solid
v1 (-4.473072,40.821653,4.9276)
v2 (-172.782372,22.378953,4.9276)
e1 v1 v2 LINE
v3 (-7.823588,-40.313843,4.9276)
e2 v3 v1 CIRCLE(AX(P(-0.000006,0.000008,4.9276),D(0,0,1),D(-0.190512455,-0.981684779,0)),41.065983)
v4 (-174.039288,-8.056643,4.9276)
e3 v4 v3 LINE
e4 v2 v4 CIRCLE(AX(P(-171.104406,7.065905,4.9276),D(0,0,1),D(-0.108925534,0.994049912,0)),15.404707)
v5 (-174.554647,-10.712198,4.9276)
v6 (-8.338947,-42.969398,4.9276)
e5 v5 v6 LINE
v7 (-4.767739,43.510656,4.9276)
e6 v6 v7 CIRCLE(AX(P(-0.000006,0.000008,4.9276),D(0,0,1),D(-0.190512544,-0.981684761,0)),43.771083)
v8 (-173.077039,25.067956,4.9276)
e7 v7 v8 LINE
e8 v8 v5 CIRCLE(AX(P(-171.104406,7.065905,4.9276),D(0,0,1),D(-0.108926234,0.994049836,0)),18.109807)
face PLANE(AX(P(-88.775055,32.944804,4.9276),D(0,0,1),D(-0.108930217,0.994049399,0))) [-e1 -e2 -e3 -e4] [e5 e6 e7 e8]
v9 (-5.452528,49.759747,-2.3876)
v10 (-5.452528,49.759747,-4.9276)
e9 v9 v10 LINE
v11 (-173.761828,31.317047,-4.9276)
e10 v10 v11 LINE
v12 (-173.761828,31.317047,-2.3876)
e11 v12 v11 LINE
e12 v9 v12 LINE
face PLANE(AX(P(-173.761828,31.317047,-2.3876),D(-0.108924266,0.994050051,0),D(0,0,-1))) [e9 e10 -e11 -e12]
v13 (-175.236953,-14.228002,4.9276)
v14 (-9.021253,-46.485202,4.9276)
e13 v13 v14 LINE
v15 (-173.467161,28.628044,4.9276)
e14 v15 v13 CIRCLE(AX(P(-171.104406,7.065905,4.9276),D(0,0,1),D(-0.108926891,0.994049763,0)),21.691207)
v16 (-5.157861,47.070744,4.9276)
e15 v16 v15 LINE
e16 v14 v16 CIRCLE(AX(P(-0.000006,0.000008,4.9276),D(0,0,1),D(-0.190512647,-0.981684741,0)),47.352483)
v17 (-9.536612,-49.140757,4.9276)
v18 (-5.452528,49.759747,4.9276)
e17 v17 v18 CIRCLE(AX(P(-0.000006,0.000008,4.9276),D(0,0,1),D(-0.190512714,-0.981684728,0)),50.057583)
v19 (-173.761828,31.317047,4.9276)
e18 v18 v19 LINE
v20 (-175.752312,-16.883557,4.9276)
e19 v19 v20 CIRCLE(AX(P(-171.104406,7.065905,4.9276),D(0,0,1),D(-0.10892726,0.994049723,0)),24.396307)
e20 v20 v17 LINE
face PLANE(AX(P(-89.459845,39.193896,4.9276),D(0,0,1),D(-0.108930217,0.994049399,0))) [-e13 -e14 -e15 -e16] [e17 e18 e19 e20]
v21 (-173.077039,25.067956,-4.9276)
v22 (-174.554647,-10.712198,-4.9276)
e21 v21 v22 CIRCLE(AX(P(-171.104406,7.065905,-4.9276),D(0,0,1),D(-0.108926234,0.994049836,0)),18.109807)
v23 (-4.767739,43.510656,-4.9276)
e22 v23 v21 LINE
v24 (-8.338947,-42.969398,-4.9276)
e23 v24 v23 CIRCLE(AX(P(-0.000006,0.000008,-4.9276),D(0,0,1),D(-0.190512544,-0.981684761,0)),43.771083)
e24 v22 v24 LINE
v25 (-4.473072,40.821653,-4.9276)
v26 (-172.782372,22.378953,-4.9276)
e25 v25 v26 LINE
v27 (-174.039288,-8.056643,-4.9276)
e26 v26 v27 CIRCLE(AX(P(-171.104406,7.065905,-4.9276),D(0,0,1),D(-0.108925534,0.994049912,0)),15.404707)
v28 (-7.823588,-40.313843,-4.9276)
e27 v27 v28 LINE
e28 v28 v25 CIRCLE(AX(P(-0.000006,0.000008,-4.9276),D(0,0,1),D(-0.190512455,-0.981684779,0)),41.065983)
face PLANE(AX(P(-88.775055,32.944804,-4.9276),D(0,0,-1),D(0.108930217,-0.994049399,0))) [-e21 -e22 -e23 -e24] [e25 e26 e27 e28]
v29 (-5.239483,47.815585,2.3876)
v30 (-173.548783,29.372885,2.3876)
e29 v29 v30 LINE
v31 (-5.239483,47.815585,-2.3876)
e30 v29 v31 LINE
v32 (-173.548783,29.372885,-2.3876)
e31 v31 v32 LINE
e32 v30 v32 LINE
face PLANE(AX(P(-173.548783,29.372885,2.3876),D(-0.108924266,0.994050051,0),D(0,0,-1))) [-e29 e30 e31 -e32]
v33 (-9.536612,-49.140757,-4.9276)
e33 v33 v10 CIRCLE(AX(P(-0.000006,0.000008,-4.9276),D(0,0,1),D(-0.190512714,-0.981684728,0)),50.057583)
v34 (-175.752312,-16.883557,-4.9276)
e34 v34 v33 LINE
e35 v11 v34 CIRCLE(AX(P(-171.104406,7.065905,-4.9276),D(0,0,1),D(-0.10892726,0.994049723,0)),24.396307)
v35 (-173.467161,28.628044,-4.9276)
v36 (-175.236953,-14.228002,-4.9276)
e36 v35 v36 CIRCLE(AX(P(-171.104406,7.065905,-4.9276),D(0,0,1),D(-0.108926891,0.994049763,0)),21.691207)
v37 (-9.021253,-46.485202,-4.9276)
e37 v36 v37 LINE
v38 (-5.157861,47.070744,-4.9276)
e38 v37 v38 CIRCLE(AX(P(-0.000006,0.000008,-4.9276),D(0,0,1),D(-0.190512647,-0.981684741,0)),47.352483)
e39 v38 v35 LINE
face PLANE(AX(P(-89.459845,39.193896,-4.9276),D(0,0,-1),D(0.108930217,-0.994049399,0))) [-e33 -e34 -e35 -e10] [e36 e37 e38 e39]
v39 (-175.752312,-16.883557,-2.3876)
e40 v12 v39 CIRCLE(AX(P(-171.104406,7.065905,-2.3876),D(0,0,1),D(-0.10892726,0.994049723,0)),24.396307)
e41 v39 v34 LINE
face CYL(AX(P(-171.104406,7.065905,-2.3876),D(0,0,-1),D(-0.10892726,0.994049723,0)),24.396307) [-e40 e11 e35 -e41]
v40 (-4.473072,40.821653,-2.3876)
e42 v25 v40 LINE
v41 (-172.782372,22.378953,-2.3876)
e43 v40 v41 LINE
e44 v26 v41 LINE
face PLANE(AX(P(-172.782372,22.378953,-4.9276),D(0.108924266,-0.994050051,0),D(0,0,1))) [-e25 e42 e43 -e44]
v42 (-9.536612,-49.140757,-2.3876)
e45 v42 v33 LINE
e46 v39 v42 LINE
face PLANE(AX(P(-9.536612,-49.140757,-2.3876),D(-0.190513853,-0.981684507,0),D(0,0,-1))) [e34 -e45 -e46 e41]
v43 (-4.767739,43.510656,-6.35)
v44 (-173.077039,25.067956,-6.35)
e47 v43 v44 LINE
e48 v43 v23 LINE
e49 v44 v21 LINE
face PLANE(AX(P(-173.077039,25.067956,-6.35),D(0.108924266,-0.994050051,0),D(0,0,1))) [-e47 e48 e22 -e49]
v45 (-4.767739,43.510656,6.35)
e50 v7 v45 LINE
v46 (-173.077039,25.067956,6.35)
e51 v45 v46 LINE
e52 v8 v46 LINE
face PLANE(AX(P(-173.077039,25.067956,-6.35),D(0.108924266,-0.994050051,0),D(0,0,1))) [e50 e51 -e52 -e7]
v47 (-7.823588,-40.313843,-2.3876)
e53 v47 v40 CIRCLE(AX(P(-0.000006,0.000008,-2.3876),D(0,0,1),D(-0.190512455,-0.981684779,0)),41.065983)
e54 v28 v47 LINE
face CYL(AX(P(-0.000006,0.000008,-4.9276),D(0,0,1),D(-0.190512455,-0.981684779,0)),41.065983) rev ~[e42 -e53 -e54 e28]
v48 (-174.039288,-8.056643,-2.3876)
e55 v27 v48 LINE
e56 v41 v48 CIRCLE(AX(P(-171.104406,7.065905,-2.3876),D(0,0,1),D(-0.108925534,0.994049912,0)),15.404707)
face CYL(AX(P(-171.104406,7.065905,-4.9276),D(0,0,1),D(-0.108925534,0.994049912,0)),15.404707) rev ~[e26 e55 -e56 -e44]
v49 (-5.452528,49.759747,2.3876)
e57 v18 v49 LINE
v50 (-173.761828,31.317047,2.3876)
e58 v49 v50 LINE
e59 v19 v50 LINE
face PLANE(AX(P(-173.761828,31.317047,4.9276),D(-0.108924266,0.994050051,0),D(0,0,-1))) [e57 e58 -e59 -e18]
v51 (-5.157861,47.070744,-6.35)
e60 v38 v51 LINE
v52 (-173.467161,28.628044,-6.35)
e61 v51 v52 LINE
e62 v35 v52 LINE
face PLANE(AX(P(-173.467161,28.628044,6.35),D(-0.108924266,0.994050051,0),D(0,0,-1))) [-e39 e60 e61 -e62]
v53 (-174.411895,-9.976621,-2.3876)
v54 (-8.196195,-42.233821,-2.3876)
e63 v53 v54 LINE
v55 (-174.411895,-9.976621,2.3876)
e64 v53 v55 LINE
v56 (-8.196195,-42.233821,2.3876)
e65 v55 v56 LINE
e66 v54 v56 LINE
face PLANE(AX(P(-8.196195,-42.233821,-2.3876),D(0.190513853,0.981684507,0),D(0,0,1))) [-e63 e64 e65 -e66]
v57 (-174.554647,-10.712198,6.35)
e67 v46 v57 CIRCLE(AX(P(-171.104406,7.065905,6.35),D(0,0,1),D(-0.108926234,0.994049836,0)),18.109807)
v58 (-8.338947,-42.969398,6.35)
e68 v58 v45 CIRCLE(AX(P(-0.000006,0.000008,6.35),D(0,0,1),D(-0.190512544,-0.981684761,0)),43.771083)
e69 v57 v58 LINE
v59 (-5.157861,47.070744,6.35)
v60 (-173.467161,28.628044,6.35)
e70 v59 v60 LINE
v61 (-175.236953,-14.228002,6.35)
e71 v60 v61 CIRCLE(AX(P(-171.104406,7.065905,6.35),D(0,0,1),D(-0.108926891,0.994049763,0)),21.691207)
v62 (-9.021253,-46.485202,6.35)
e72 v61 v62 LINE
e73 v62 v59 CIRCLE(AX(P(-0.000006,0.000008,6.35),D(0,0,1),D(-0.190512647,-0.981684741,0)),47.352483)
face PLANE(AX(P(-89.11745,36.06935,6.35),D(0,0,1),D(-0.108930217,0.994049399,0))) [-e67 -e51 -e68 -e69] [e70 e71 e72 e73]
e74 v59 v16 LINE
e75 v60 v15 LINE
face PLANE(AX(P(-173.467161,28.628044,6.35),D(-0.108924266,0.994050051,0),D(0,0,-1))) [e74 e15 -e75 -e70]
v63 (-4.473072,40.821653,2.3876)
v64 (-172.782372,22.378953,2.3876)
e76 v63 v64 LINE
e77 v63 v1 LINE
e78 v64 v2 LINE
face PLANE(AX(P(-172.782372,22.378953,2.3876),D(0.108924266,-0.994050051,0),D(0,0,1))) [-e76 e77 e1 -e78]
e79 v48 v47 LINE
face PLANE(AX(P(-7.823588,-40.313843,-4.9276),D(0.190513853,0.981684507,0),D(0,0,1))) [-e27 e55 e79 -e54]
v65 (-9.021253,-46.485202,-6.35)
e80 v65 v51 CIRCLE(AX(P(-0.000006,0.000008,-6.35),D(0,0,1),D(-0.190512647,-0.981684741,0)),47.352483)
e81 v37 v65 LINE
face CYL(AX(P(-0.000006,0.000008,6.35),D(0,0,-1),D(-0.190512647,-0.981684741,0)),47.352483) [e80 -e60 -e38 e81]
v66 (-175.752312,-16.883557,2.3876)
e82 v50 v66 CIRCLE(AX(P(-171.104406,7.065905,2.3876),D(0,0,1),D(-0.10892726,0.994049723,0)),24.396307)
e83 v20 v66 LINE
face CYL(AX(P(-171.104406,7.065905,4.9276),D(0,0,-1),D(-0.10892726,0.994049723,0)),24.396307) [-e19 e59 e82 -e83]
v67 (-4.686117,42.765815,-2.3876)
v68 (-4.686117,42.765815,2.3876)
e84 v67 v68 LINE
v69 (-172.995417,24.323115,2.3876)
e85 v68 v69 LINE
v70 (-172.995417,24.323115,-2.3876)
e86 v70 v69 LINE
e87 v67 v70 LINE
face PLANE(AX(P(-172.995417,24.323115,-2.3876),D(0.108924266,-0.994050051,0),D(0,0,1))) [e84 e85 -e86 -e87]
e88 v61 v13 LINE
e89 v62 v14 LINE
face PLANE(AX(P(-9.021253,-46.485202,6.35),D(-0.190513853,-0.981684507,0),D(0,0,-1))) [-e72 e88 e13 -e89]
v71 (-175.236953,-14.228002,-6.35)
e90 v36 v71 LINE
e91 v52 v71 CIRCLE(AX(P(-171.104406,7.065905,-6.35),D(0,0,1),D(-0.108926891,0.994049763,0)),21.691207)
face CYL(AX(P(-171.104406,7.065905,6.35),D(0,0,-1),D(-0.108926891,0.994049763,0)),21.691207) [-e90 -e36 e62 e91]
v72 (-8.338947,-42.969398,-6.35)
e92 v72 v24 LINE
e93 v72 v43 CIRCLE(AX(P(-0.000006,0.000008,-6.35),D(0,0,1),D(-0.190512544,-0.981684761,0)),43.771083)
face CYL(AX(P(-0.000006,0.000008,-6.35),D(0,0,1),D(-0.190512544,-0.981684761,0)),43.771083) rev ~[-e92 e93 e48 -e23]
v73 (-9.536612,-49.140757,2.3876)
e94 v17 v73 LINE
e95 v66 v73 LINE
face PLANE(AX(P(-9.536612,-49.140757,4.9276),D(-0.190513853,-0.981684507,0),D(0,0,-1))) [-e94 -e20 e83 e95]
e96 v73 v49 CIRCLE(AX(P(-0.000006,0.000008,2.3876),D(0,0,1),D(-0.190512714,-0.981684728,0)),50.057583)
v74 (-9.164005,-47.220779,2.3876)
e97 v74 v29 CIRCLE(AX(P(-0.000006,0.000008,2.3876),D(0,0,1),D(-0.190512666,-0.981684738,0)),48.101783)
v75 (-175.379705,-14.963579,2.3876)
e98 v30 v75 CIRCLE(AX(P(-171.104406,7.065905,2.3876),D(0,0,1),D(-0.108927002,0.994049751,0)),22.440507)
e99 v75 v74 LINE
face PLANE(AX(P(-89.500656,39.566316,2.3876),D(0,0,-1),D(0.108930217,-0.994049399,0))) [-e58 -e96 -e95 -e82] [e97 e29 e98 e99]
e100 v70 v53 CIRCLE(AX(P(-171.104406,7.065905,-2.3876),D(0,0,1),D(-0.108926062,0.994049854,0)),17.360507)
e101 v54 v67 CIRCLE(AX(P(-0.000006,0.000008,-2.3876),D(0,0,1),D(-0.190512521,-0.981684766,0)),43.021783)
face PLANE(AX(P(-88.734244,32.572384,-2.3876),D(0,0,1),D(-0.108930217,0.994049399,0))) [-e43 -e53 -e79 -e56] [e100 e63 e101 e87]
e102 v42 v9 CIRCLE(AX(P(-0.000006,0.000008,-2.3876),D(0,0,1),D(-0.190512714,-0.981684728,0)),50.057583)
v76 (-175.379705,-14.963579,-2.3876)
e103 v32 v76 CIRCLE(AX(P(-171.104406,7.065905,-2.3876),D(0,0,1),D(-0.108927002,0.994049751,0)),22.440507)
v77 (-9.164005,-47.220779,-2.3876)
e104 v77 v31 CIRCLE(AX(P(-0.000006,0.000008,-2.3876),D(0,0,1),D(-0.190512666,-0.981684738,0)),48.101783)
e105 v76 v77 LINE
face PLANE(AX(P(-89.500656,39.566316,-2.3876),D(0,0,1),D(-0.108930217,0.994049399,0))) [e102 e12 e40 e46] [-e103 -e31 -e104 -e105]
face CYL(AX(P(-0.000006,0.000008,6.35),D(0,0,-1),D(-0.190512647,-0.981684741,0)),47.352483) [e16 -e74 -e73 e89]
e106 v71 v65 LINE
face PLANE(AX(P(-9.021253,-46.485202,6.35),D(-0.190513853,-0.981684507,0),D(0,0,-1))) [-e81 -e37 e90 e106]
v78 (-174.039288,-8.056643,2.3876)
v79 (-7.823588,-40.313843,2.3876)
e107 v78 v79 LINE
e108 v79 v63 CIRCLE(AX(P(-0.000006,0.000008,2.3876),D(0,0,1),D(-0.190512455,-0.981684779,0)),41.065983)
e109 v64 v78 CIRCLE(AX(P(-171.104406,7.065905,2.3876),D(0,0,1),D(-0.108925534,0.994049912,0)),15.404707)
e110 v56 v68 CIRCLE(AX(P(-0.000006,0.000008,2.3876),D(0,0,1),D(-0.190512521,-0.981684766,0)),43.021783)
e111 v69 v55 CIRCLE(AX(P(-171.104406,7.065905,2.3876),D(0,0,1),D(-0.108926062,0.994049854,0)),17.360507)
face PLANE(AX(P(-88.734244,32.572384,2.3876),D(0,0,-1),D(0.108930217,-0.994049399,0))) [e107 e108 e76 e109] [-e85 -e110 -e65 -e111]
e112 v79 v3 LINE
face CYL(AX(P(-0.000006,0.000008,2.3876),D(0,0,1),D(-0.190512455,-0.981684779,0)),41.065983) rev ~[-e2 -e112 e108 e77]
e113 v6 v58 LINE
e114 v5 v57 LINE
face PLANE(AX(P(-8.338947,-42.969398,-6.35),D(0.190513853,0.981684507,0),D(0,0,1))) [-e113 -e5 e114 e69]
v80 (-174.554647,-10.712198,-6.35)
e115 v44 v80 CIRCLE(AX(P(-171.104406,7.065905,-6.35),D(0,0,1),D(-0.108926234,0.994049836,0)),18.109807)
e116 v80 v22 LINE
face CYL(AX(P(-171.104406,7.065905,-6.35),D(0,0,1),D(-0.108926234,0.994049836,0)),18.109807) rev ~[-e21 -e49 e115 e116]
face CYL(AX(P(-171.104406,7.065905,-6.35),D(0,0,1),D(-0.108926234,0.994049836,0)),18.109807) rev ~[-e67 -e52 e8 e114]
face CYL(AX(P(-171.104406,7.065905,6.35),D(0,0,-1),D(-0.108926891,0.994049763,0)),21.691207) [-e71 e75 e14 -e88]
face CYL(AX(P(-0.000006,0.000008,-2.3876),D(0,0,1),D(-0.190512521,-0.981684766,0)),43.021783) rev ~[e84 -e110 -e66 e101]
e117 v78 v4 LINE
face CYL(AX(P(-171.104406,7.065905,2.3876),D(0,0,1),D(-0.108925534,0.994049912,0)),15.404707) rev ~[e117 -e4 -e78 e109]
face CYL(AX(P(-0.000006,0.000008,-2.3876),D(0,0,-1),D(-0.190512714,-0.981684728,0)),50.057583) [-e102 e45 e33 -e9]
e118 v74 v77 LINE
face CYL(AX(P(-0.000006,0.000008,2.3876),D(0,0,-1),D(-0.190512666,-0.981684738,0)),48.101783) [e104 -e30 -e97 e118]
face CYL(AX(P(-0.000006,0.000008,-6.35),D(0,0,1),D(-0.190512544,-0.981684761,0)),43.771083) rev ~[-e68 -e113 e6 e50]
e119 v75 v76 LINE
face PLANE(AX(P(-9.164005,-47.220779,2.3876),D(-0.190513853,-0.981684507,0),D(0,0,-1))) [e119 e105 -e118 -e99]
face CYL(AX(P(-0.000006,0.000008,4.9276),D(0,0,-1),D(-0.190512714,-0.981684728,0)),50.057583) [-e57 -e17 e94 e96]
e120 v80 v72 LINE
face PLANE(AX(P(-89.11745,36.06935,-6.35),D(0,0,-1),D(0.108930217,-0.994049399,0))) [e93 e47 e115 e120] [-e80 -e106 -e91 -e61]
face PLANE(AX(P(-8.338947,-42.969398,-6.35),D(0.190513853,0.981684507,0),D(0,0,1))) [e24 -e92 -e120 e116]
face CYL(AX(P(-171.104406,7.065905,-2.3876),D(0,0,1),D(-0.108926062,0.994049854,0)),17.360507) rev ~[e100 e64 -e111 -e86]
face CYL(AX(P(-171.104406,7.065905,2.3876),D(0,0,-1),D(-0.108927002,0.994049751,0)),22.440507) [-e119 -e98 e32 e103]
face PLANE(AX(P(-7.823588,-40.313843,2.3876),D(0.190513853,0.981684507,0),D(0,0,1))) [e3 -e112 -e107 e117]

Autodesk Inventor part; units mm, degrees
ref_plane "Work Plane2" through (-171.1044, 7.0659, 0) normal (-1, 0, 0) x (0, 0, 1)
ref_plane "Work Plane3" through (0, 0, 0) normal (-0.9998873, -0.0150135, 0) x (0, 0, 1)
sketch "Path" plane through (0, 0, 0) normal (0, 0, 1) x (1, 0, 0)
  arc A0 (-173.2721, 26.848) -> (-174.8958, -12.4701) centre (-171.1044, 7.0659) ccw
  arc A1 (-8.6801, -44.7273) -> (-4.9628, 45.2907) centre (0, 0) ccw
  line L0 (-8.6801, -44.7273) -> (-174.8958, -12.4701)
  line L1 (-173.2721, 26.848) -> (-4.9628, 45.2907)
  dimension "d31" = 8.9916
ref_plane "Section Plane" through (-174.8958, -12.4701, 0) normal (0.9816845, -0.1905139, 0) x (0, 0, 1)
sketch "Section Sketch" plane through (-174.8958, -12.4701, 0) normal (0.9816845, -0.1905139, 0) x (0, 0, 1)
  line L0 (-6.35, -1.7907) -> (6.35, -1.7907)
  line L1 (6.35, -1.7907) -> (6.35, 1.7907)
  line L2 (6.35, 1.7907) -> (-6.35, 1.7907)
  line L3 (-6.35, 1.7907) -> (-6.35, -1.7907)
  line L4 (-2.3876, -2.54) -> (2.3876, -2.54)
  line L5 (2.3876, -2.54) -> (2.3876, 2.54)
  line L6 (2.3876, 2.54) -> (-2.3876, 2.54)
  line L7 (-2.3876, 2.54) -> (-2.3876, -2.54)
  line L8 (-2.3876, 0) -> (2.3876, 0) construction
  line L9 (-4.9276, -4.4958) -> (-2.3876, -4.4958)
  line L10 (-2.3876, -4.4958) -> (-2.3876, 4.4958)
  line L11 (-2.3876, 4.4958) -> (-4.9276, 4.4958)
  line L12 (-4.9276, 4.4958) -> (-4.9276, -4.4958)
  line L13 (2.3876, -4.4958) -> (4.9276, -4.4958)
  line L14 (4.9276, -4.4958) -> (4.9276, 4.4958)
  line L15 (4.9276, 4.4958) -> (2.3876, 4.4958)
  line L16 (2.3876, 4.4958) -> (2.3876, -4.4958)
  line L17 (-6.35, 0) -> (6.35, 0) construction
  point P0 (0, 0)
  point P1 (0, 0)
  dimension "d21" = 3.5814
  dimension "d22" = 5.08
  dimension "d23" = 4.7752
  dimension "d24" = 2.54
  dimension "d31" = 8.9916
  dimension "d32" = 12.7
sweep "Solid" add profiles "Section Sketch" path "Path"
pattern_of_one "Strand Pattern"
equation "\"d21\" = da_d2"
equation "\"d22\" = da_d1"
equation "\"d23\" = da_b1"
equation "\"d24\" = da_t1 + da_t2"
equation "\"d30\" = da_pt"
equation "\"da_p\" = 9.525"
equation "\"da_b1\" = 4.7752"
equation "\"da_h2\" = 8.9916"
equation "\"da_h3\" = 7.7978"
equation "\"da_d1\" = 5.08"
equation "\"da_d2\" = 3.5814"
equation "\"da_pt\" = 10.1346"
equation "\"da_b\" = 12.7"
equation "\"da_t1\" = 1.27"
equation "\"da_t2\" = 1.27"
properties part number "Roller Chain"
